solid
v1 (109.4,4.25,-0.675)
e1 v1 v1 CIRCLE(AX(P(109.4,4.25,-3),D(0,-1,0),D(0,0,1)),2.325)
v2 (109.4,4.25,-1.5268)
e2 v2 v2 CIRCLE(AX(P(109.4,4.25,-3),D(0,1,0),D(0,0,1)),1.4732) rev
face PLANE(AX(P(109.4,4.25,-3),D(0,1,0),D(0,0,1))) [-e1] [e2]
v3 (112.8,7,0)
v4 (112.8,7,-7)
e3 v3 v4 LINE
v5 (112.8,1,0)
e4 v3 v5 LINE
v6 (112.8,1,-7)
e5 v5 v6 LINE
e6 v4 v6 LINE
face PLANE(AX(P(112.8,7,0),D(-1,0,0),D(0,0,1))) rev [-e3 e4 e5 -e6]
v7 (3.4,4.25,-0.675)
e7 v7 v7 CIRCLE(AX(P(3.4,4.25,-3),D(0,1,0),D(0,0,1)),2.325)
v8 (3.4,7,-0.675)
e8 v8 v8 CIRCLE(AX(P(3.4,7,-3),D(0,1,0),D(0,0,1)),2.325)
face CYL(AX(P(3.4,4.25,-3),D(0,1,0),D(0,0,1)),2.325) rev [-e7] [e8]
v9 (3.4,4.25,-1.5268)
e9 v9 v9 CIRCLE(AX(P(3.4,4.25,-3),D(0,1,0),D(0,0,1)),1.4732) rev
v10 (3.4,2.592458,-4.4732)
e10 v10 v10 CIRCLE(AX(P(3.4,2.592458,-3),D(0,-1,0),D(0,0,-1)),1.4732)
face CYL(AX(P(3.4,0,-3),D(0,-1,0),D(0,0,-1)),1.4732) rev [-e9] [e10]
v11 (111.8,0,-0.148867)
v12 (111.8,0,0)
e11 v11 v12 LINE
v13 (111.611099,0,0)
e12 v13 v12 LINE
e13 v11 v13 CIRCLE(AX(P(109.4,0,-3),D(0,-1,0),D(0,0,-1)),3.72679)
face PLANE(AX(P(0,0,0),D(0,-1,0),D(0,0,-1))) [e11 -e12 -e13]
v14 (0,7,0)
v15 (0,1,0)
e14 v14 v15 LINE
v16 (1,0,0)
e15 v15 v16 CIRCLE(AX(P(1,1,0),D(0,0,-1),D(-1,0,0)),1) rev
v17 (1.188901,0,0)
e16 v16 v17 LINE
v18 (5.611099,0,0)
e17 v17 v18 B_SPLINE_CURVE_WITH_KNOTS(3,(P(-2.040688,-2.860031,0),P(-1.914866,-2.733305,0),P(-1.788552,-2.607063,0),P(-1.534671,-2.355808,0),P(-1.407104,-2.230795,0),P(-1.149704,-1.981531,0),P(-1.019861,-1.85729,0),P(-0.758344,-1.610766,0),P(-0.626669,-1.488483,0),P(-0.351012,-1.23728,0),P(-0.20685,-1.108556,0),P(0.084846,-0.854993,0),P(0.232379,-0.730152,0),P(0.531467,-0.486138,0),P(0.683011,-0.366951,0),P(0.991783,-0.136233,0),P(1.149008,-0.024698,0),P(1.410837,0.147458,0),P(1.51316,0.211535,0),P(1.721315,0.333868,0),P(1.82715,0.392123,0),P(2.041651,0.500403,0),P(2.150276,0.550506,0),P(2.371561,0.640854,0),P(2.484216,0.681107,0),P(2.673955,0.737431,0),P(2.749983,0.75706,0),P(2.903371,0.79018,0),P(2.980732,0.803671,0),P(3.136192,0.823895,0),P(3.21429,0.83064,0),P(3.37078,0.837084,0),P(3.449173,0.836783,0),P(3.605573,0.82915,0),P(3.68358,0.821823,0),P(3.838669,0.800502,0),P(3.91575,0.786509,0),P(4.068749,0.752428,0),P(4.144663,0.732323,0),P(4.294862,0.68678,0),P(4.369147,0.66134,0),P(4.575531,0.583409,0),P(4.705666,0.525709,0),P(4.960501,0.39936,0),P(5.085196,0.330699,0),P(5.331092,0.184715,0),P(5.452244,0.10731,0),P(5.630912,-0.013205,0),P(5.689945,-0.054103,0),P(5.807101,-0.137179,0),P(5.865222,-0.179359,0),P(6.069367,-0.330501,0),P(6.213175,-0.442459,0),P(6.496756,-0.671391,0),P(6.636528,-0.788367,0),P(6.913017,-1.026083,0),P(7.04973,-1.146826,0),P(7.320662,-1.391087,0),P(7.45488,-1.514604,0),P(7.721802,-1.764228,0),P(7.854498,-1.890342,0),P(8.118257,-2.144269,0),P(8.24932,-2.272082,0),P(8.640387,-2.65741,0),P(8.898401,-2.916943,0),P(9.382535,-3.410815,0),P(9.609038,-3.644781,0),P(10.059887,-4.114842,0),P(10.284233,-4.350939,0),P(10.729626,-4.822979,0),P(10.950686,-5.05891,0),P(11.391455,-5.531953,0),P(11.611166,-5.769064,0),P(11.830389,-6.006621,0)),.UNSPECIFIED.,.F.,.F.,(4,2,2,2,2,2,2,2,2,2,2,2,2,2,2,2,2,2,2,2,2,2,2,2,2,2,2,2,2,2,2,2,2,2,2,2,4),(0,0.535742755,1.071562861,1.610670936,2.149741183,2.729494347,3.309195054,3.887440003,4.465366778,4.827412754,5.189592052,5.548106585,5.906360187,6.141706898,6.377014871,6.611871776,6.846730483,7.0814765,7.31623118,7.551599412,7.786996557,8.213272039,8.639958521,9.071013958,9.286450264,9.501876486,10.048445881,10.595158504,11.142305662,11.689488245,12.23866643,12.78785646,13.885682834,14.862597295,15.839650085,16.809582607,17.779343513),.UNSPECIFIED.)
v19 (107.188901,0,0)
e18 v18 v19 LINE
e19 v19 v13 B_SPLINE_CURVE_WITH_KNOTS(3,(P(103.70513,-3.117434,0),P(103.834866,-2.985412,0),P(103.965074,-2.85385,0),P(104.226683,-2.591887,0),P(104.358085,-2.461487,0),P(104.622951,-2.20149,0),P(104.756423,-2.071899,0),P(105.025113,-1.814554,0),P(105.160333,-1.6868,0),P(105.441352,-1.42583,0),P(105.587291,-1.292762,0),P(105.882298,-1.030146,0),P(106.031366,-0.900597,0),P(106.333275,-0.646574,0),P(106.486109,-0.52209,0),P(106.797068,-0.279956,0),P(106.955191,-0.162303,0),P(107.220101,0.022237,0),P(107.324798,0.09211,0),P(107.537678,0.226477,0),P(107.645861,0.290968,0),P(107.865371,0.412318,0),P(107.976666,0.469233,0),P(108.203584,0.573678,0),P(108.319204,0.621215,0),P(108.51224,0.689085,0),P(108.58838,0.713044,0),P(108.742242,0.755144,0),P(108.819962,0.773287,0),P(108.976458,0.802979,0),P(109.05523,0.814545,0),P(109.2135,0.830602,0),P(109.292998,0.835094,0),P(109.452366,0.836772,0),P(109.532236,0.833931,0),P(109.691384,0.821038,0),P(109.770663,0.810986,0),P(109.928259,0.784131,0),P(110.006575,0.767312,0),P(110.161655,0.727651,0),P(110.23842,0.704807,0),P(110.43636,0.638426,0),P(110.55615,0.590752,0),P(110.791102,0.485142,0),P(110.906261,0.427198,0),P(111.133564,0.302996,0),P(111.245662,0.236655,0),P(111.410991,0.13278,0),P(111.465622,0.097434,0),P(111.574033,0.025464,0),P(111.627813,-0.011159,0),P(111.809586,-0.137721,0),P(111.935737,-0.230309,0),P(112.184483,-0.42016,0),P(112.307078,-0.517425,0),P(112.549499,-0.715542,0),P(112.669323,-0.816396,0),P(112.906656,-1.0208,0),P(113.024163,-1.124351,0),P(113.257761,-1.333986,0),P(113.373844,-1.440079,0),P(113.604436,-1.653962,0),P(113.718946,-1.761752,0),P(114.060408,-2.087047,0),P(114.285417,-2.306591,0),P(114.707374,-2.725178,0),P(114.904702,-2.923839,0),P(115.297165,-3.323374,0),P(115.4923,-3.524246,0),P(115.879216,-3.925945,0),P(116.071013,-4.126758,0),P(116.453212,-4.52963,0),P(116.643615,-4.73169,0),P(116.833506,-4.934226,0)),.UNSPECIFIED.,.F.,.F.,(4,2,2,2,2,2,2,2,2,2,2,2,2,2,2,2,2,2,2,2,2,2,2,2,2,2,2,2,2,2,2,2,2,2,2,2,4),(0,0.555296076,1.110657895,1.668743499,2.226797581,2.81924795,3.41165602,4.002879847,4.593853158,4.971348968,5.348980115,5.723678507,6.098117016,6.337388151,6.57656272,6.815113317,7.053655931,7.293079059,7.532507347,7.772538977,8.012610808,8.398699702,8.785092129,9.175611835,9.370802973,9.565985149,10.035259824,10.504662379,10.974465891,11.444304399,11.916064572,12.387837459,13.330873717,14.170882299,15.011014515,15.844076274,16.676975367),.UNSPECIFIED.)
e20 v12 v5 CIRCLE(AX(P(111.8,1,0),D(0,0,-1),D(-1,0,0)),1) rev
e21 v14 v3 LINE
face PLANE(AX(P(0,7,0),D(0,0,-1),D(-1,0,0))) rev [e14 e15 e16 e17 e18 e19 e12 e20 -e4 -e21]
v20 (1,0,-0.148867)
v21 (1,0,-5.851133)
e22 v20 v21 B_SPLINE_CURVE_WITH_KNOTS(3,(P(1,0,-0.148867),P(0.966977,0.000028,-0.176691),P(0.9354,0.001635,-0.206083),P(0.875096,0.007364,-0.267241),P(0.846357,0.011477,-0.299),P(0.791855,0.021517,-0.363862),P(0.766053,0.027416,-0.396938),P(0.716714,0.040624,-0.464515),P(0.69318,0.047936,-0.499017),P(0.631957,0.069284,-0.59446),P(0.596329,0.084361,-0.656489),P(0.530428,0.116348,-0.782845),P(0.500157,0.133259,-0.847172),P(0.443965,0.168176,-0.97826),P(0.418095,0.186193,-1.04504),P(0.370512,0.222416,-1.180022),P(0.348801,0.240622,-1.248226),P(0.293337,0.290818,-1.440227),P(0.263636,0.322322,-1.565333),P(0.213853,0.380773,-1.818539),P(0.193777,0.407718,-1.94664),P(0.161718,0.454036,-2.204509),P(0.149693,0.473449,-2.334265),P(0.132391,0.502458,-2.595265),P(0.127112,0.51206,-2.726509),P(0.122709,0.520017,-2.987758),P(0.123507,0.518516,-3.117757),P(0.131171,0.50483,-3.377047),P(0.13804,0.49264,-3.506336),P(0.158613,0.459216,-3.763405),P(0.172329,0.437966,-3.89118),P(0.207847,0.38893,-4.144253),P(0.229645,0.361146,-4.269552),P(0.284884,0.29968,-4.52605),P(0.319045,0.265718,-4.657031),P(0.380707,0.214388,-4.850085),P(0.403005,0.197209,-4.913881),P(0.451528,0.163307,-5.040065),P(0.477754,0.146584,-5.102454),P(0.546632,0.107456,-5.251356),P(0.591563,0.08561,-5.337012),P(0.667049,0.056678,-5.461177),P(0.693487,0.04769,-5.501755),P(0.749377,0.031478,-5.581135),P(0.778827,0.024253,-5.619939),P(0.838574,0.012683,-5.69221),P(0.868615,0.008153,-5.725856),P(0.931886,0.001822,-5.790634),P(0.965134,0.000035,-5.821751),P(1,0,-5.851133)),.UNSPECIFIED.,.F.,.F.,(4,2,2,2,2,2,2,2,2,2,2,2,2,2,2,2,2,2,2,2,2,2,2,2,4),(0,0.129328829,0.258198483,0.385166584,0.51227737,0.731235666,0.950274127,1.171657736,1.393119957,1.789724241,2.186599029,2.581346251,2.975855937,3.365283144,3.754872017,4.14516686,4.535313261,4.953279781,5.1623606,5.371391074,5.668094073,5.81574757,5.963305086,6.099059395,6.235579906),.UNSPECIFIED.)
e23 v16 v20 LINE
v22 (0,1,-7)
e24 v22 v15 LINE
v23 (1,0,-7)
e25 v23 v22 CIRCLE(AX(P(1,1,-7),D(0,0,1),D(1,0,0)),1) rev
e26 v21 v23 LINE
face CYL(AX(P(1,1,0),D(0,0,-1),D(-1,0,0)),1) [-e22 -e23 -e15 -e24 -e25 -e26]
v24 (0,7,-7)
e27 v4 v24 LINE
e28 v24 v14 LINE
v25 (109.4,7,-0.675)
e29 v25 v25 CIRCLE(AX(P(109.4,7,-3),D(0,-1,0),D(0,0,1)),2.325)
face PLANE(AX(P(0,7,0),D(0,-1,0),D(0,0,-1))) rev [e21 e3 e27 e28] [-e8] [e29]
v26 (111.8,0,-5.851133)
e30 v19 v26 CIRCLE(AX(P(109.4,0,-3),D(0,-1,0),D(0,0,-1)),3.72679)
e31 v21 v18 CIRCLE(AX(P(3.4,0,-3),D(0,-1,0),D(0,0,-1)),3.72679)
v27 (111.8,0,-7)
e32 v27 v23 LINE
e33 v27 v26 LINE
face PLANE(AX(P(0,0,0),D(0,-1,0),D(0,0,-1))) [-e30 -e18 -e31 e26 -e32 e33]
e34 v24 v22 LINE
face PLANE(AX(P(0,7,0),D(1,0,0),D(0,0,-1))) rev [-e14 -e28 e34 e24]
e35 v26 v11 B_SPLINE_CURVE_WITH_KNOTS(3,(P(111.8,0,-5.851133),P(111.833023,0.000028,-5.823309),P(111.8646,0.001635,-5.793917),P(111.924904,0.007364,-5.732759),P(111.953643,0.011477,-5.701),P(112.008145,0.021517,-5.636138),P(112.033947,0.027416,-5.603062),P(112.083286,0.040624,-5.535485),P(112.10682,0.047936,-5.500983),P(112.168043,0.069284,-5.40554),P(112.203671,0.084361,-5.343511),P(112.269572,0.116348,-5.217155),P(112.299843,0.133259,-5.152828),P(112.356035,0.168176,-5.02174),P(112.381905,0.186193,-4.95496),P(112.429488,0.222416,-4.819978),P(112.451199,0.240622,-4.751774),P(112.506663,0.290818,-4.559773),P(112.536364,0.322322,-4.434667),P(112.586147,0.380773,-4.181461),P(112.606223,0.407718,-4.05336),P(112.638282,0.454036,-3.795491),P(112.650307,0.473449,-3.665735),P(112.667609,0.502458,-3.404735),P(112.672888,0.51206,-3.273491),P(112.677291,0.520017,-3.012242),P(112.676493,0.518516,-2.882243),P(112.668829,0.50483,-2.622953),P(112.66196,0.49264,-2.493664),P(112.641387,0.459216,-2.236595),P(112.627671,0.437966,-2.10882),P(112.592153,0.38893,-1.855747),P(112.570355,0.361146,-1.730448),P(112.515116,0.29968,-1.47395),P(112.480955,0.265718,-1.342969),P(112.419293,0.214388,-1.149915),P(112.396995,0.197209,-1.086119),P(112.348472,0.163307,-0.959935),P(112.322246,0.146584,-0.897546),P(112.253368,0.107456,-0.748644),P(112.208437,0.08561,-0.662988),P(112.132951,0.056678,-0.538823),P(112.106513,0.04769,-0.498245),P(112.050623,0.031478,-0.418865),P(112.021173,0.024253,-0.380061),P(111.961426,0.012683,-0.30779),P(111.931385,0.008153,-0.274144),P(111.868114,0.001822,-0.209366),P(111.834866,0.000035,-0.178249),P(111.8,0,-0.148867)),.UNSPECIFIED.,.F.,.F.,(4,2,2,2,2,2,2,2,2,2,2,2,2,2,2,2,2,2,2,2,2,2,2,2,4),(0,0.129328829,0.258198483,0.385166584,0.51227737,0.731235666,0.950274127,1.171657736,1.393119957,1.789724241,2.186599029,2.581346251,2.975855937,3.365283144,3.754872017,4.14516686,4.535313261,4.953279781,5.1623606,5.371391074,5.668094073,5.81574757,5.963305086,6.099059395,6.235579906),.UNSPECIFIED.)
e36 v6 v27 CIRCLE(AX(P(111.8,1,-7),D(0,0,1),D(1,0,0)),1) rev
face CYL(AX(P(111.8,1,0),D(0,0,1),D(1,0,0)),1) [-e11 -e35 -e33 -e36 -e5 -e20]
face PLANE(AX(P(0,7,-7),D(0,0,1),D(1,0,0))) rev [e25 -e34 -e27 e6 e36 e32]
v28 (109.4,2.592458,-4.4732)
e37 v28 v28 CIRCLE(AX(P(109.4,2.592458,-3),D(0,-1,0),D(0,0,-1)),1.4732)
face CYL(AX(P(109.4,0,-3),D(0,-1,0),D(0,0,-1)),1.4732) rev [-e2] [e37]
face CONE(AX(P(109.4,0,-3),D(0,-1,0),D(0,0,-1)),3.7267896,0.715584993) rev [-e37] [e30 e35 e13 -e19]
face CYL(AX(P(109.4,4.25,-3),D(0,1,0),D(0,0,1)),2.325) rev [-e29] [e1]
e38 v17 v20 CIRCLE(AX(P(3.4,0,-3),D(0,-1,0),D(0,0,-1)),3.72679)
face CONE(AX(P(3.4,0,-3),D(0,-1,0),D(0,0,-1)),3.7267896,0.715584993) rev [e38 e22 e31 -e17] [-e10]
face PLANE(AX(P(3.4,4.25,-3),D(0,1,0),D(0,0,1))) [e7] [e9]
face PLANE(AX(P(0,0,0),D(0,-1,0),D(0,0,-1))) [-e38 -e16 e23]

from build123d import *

# Parameters (mm, degrees)
SKETCH1_W                                      = 112.8
SKETCH1_H                                      = 7
BOSS_EXTRUDE1_DEPTH                            = 7
CSK_FOR_4_FLAT_HEAD_MACHINE_SCREW1_D           = 2.9464
CSK_FOR_4_FLAT_HEAD_MACHINE_SCREW1_CSINK_D     = 7.4535792
CSK_FOR_4_FLAT_HEAD_MACHINE_SCREW1_CSINK_ANGLE = 82
FILLET1_R                                      = 1
SKETCH5_R                                      = 2.325
F_4_40_REGISTRATION_HOLE_DEPTH                 = 2.75


with BuildPart() as part:
    # Sketch1 → Boss-Extrude1 (new body)
    with BuildSketch(Plane(origin=(0, 0, 0), x_dir=(1, 0, 0), z_dir=(0, 1, 0))):
        with Locations((56.4, 3.5)):
            Rectangle(SKETCH1_W, SKETCH1_H)
    extrude(amount=BOSS_EXTRUDE1_DEPTH)

    # CSK for #4 Flat Head Machine Screw1 (through all)
    with Locations(Plane(origin=(0, 0, 0), x_dir=(-1, 0, 0), z_dir=(0, -1, 0))):
        with Locations((-109.4, 3), (-3.4, 3)):
            CounterSinkHole(CSK_FOR_4_FLAT_HEAD_MACHINE_SCREW1_D / 2, CSK_FOR_4_FLAT_HEAD_MACHINE_SCREW1_CSINK_D / 2, counter_sink_angle=CSK_FOR_4_FLAT_HEAD_MACHINE_SCREW1_CSINK_ANGLE)

    # Fillet1
    # the kernel refuses this fillet: 1 mm, written as the material it takes off along each edge
    with BuildSketch(Plane(origin=(0, 0, -9.5), x_dir=(0, 1, 0), z_dir=(0, 0, 1)), Plane(origin=(112.8, 0, -2.026093288), x_dir=(0, 1, 0), z_dir=(0, 0, -1))) as fillet1_piece_1:
        with BuildLine():
            CenterArc((FILLET1_R, -FILLET1_R), FILLET1_R, 90, 90)
            Line((0, -FILLET1_R), (0, 0))
            Line((0, 0), (FILLET1_R, 0))
        make_face()
    extrude(amount=7.473906712, mode=Mode.SUBTRACT)
    with BuildSketch(Plane(origin=(0, 0, -3.973906712), x_dir=(0, 1, 0), z_dir=(0, 0, 1)), Plane(origin=(112.8, 0, 2.5), x_dir=(0, 1, 0), z_dir=(0, 0, -1))) as fillet1_piece_2:
        with BuildLine():
            CenterArc((FILLET1_R, -FILLET1_R), FILLET1_R, 90, 90)
            Line((0, -FILLET1_R), (0, 0))
            Line((0, 0), (FILLET1_R, 0))
        make_face()
    extrude(amount=6.473906712, mode=Mode.SUBTRACT)

    # Sketch5 → 4-40 registration hole (cut)
    with BuildSketch(Plane(origin=(0, 7, 0), x_dir=(1, 0, 0), z_dir=(0, 1, 0))):
        with Locations(Location((3.4, 3, 0), (0, 0, 270))):
            Circle(SKETCH5_R)
    f_4_40_registration_hole = extrude(amount=-F_4_40_REGISTRATION_HOLE_DEPTH, mode=Mode.SUBTRACT)

    # Mirror1: 4-40 registration hole across plane
    add(f_4_40_registration_hole.mirror(Plane(origin=(56.4, 0, 0), x_dir=(0, 0, 1), z_dir=(1, 0, 0))), mode=Mode.SUBTRACT)


solid = part.part
